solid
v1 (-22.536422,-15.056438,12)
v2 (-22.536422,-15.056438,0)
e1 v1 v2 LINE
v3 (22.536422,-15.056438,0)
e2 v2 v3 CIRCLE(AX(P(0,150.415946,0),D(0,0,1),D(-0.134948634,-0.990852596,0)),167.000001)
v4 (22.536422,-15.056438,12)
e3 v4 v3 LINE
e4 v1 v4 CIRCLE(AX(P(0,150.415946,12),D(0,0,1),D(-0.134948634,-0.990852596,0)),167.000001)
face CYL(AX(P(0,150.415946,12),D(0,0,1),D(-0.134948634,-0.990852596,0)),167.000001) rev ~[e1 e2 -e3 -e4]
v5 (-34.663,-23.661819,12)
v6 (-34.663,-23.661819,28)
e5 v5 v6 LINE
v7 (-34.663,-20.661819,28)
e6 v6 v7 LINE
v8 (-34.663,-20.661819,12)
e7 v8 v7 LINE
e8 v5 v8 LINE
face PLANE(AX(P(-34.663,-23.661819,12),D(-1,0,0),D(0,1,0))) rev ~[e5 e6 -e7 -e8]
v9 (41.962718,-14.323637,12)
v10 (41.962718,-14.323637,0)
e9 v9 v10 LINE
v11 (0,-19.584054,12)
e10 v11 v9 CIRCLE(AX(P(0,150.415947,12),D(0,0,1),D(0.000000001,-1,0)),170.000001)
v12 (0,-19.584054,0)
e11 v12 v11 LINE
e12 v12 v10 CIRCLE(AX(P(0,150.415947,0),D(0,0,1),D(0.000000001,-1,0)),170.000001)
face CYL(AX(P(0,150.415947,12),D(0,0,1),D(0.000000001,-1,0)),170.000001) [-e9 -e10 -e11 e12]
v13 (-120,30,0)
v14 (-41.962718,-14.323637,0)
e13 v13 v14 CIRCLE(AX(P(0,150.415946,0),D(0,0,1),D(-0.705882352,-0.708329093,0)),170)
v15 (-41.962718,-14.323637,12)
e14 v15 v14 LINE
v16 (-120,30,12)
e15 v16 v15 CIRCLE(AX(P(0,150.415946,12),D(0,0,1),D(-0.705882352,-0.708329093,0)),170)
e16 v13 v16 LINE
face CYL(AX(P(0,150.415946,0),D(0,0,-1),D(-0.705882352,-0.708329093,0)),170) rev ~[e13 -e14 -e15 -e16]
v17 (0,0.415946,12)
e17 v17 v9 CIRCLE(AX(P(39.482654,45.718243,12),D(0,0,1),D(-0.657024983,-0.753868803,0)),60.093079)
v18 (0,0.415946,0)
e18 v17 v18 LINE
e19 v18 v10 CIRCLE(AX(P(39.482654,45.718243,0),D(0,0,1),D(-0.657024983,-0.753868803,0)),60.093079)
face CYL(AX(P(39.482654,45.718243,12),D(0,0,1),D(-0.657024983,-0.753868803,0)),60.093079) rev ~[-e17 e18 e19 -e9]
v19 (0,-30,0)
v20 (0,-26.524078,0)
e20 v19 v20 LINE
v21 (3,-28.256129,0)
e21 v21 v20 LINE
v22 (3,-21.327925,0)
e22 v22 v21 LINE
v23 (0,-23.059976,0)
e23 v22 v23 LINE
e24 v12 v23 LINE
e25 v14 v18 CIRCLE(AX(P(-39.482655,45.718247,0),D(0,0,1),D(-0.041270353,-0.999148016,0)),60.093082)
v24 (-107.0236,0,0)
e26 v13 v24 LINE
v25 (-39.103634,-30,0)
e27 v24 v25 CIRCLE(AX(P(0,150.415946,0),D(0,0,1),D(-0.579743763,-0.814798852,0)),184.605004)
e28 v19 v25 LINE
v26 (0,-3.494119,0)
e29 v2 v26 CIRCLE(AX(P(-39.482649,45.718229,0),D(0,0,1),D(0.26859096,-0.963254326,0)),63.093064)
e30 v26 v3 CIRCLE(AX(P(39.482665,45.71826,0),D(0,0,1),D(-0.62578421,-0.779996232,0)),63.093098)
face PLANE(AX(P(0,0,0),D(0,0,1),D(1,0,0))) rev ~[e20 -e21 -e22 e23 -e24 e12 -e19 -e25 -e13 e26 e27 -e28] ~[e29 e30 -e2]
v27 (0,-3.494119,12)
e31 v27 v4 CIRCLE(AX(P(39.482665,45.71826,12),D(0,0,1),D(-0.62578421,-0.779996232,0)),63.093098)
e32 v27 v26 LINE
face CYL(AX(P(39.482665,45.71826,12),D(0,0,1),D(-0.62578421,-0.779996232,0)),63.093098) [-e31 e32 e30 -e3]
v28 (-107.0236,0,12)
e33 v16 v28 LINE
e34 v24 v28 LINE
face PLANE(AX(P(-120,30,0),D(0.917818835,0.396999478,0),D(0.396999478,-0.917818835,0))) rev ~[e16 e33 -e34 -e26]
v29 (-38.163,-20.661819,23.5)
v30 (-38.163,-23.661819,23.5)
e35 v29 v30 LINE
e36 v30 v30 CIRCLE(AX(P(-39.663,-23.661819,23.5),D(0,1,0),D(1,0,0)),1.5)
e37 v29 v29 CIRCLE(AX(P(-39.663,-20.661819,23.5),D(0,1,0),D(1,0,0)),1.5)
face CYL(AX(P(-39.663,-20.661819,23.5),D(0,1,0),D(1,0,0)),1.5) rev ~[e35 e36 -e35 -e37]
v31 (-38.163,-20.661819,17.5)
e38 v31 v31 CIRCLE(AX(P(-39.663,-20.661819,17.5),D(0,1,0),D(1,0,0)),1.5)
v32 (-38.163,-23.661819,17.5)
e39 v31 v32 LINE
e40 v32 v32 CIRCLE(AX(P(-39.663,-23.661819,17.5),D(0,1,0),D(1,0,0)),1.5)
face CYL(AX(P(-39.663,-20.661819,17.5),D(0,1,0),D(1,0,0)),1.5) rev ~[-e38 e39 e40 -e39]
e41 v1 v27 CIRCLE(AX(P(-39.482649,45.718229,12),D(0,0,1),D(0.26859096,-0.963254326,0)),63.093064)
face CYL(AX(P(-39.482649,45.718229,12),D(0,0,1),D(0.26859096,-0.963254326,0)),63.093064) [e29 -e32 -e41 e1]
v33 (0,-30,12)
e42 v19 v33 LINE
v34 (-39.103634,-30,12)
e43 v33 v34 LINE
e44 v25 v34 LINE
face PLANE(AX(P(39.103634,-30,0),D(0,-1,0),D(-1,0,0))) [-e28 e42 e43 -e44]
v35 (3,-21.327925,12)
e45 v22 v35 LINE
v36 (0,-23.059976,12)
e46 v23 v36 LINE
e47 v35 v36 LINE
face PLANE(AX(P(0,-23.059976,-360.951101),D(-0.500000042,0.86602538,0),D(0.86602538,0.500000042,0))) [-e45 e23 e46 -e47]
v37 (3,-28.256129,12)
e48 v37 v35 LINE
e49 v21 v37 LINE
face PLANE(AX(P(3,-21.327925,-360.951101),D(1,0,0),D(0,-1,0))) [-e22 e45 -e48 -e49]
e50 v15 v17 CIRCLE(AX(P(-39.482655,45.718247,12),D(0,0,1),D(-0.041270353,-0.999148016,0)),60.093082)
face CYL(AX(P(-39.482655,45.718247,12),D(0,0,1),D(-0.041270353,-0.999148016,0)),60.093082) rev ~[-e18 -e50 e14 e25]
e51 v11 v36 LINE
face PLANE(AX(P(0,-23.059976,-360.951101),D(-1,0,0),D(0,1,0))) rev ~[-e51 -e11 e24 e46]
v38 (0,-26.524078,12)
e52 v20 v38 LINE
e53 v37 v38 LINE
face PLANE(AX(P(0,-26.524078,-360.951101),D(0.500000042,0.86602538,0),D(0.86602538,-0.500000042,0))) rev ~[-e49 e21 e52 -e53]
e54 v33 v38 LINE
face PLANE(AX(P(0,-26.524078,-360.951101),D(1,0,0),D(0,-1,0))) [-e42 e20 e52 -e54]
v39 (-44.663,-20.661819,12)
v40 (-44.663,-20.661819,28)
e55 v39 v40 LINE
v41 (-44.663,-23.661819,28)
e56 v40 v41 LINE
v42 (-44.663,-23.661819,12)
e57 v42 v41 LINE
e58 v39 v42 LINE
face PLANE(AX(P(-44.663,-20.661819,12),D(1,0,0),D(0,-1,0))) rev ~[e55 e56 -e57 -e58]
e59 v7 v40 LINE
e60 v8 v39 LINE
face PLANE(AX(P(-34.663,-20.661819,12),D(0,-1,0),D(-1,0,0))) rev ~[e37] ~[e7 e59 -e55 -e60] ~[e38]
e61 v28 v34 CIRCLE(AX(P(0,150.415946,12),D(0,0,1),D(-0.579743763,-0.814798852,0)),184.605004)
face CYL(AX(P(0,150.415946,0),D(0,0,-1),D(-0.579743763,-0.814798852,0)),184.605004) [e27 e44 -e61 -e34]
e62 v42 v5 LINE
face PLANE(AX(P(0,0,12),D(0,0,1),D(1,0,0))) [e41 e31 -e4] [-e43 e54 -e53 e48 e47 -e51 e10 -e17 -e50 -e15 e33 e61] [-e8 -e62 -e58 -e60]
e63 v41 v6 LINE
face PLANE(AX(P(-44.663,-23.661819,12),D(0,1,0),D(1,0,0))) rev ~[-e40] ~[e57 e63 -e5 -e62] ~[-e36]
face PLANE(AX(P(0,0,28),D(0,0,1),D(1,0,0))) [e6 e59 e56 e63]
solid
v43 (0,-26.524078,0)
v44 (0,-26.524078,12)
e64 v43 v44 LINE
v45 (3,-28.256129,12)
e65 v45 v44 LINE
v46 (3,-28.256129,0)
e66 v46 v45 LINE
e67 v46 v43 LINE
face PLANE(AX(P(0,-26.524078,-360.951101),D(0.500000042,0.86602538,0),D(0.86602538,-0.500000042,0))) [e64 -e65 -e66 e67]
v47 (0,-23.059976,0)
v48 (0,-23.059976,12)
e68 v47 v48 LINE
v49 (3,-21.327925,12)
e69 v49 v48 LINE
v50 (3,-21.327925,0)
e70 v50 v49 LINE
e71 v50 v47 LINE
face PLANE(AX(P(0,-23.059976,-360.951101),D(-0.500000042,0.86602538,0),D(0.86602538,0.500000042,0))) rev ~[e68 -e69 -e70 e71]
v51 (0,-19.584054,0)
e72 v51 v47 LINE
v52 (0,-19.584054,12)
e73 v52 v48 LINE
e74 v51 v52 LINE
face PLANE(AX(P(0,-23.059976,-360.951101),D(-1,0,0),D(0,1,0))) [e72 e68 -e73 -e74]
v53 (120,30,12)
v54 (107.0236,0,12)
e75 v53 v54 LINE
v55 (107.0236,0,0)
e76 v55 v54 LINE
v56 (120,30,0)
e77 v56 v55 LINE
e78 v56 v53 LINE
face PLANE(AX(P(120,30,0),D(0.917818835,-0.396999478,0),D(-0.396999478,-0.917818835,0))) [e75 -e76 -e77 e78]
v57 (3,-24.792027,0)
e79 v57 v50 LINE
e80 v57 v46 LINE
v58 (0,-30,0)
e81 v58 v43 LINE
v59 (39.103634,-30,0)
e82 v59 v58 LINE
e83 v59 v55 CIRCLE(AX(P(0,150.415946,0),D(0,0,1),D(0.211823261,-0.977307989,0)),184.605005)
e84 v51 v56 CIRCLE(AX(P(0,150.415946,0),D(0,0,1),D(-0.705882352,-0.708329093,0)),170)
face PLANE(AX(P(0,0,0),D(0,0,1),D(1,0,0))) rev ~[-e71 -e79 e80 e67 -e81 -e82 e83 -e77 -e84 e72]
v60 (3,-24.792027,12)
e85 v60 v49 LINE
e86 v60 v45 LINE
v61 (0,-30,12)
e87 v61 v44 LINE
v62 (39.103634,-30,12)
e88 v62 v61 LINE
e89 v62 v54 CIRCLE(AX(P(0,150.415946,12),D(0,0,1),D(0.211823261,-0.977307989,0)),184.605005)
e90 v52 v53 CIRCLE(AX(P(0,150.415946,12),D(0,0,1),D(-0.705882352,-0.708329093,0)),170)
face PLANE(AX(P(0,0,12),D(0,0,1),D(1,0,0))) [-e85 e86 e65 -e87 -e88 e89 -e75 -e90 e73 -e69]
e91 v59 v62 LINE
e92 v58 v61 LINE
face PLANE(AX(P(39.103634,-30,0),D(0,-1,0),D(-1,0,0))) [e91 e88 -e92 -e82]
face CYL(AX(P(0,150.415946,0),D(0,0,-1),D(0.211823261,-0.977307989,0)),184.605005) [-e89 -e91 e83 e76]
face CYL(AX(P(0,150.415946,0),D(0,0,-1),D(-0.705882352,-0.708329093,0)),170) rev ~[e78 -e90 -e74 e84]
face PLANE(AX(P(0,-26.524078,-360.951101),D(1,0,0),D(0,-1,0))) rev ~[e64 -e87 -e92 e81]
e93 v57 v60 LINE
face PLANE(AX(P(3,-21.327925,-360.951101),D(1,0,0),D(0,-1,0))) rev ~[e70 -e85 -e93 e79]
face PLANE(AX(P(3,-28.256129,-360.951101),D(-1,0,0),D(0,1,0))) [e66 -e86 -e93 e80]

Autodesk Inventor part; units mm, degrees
sketch "Эскиз1" plane through (0, 0, 0) normal (0, 0, 1) x (1, 0, 0)
  line L0 (39.103634, -30) -> (-39.103634, -30)
  line L1 (-120, 30) -> (120, -30) construction
  line L2 (120, 30) -> (-120, -30) construction
  line L3 (0, -30) -> (0, -27) construction
  arc A0 (-120, 30) -> (120, 30) centre (0, 150.415946) ccw
  arc A1 (-107.0236, 0) -> (-39.103634, -30) centre (0, 150.415946) ccw
  arc A2 (39.103634, -30) -> (107.0236, 0) centre (0, 150.415946) ccw
  line L4 (120, 30) -> (107.0236, 0)
  line L5 (-120, 30) -> (-107.0236, 0)
  point P0 (0, 0)
  dimension "d0" = 240
  dimension "d1" = 60
  dimension "d6" = 3
  dimension "d7" = 170
extrude "Выдавливание1" add sketch "Эскиз1" along normal blind 12
sketch "Эскиз2" plane through (0, 0, 12) normal (0, 0, 1) x (1, 0, 0)
  line L0 (-39.103634, -30) -> (39.103634, -30)
  line L1 (-39.103634, -30) -> (39.103634, -30) construction
  line L2 (0, -30) -> (10, -30) construction
  line L3 (0, -30) -> (-10, -30) construction
  arc A0 (-120, 30) -> (120, 30) centre (0, 150.415946) ccw
  line L4 (-120, 30) -> (-107.0236, 0)
  arc A1 (-107.0236, 0) -> (-39.103634, -30) centre (0, 150.415946) ccw
  arc A2 (39.103634, -30) -> (107.0236, 0) centre (0, 150.415946) ccw
  line L5 (107.0236, 0) -> (120, 30)
  point P0 (0, 0)
  point P1 (-12, -3)
  point P2 (12, -3)
  dimension "d4" = 10
  dimension "d5" = 10
sketch "Эскиз3" plane through (0, 0, 12) normal (0, 0, 1) x (1, 0, 0)
  line L0 (-39.103634, -30) -> (39.103634, -30) construction
  line L1 (0, -30) -> (0, -19.584054) construction
  arc A0 (-120, 30) -> (120, 30) centre (0, 150.415946) ccw construction
  line L2 (0, -24.792027) -> (-58.147862, -24.792027) construction
  arc A1 (-107.0236, 0) -> (-39.103634, -30) centre (0, 150.415946) ccw construction
  arc A2 (39.103634, -30) -> (107.0236, 0) centre (0, 150.415946) ccw construction
  line L3 (58.147862, -24.792027) -> (0, -24.792027) construction
  line L4 (0, -24.792027) -> (0, -27.792027)
  line L5 (0, -27.792027) -> (0, -21.792027)
  line L6 (0, -24.792027) -> (6, -24.792027) construction
  line L7 (0, -26.524078) -> (3, -28.256129)
  line L8 (0, -24.792027) -> (6.928203, -24.792027) construction
  line L9 (3, -28.256129) -> (3, -24.792027)
  line L10 (0, -23.059976) -> (3, -21.327925)
  line L11 (0, -24.792027) -> (6.928203, -24.792027) construction
  line L12 (3, -21.327925) -> (3, -24.792027)
  line L13 (0, -24.792027) -> (-3, -24.792027) construction
  line L14 (0, -23.059976) -> (0, -19.584054)
  line L15 (0, -26.524078) -> (0, -30)
  point P0 (0, 0)
  dimension "d8" = 3
  dimension "d9" = 6
  dimension "d10" = 6
  dimension "d11" = 30
  dimension "d12" = 30
  dimension "d13" = 3
sketch "Эскиз4" plane through (0, 0, 0) normal (0, 0, -1) x (-1, 0, 0)
  line L0 (-3, -28.256129) -> (-3, -24.792027)
  line L1 (0, -26.524078) -> (-3, -28.256129)
  line L2 (-3, -21.327925) -> (-3, -24.792027)
  line L3 (0, -23.059976) -> (-3, -21.327925)
  line L4 (0, -24.792027) -> (0, -27.792027)
  line L5 (0, -27.792027) -> (0, -21.792027)
  point P0 (0, 0)
ref_plane "РабПлоскость1" through (3, -21.327925, 12) normal (0.5, -0.8660254, 0) x (-0.8660254, -0.5, 0)
ref_plane "РабПлоскость2" through (3, -21.327925, 0) normal (-1, 0, 0) x (0, -1, 0)
ref_plane "РабПлоскость3" through (0, -26.524078, 12) normal (0.5, 0.8660254, 0) x (0.8660254, -0.5, 0)
ref_plane "РабПлоскость4" through (0, -19.584054, 12) normal (1, 0, 0) x (0, -1, 0)
ref_plane "РабПлоскость5" through (0, -26.524078, 0) normal (-1, 0, 0) x (0, -1, 0)
split body "Разделение1" sketch "Эскиз3" result two bodies curves L15 L7 L9 L12 L10 L14 first body at (-18.576653, -26.256352, 0.5)
sketch "Эскиз5" plane through (0, 0, 12) normal (0, 0, 1) x (1, 0, 0)
  line L0 (0, -19.584054) -> (0, -23.059976)
  arc A0 (-120, 30) -> (0, -19.584054) centre (0, 150.415946) ccw
  line L1 (-120, 30) -> (-107.0236, 0)
  arc A1 (-107.0236, 0) -> (-39.103634, -30) centre (0, 150.415946) ccw
  line L2 (-39.103634, -30) -> (0, -30)
  line L3 (0, -26.524078) -> (0, -30)
  line L4 (3, -28.256129) -> (0, -26.524078)
  line L5 (3, -21.327925) -> (3, -28.256129)
  line L6 (0, -23.059976) -> (3, -21.327925)
  line L7 (39.103634, -30) -> (0, -30)
  line L8 (0, -19.584054) -> (0, -23.059976)
  line L9 (0, -23.059976) -> (3, -21.327925)
  line L10 (3, -21.327925) -> (3, -28.256129)
  line L11 (3, -28.256129) -> (0, -26.524078)
  line L12 (0, -26.524078) -> (0, -30)
  line L13 (0, -30) -> (39.103634, -30)
  arc A2 (39.103634, -30) -> (107.0236, 0) centre (0, 150.415946) ccw
  line L14 (107.0236, 0) -> (120, 30)
  arc A3 (0, -19.584054) -> (120, 30) centre (0, 150.415946) ccw
  arc A4 (0, -19.584054) -> (120, 30) centre (0, 150.415946) ccw construction
  line L15 (0, -19.584054) -> (0, 0.415946) construction
  arc A5 (0, -19.584054) -> (120, 30) centre (0, 150.415946) ccw
  arc A6 (0, 0.415946) -> (41.962718, -14.323637) centre (39.482655, 45.718245) ccw
  arc A7 (-41.962718, -14.323637) -> (0, 0.415946) centre (-39.482655, 45.718245) ccw
  arc A8 (-41.962718, -14.323637) -> (41.962718, -14.323637) centre (0, 150.415946) ccw
  arc A9 (0, -3.494119) -> (22.536422, -15.056438) centre (39.482655, 45.718245) ccw
  arc A10 (-22.536422, -15.056438) -> (22.536422, -15.056438) centre (0, 150.415946) ccw
  arc A11 (-22.536422, -15.056438) -> (0, -3.494119) centre (-39.482655, 45.718245) ccw
  point P0 (0, 0)
  dimension "d15" = 20
  dimension "d18" = 3
extrude "Выдавливание2" add sketch "Эскиз5" against normal up to surface (12 mm away) contours A0 A7 A6 A3 bodies 2
sketch "Эскиз6" plane through (0, 0, 12) normal (0, 0, 1) x (1, 0, 0)
  arc A0 (-22.536422, -15.056438) -> (0, -3.494119) centre (-39.482655, 45.718245) ccw construction
  arc A1 (0, -3.494119) -> (22.536422, -15.056438) centre (39.482655, 45.718245) ccw construction
  arc A2 (-22.536422, -15.056438) -> (22.536422, -15.056438) centre (0, 150.415946) ccw construction
  line L0 (0, -19.584054) -> (0, -23.059976) construction
  arc A3 (0, -19.584054) -> (41.962718, -14.323637) centre (0, 150.415946) ccw construction
  arc A4 (0, 0.415946) -> (41.962718, -14.323637) centre (39.482655, 45.718245) ccw construction
  arc A5 (-41.962718, -14.323637) -> (0, 0.415946) centre (-39.482655, 45.718245) ccw construction
  arc A6 (-120, 30) -> (-41.962718, -14.323637) centre (0, 150.415946) ccw construction
  line L1 (-120, 30) -> (-107.0236, 0) construction
  arc A7 (-107.0236, 0) -> (-39.103634, -30) centre (0, 150.415946) ccw construction
  line L2 (-39.103634, -30) -> (0, -30) construction
  line L3 (0, -26.524078) -> (0, -30) construction
  line L4 (3, -28.256129) -> (0, -26.524078) construction
  line L5 (3, -21.327925) -> (3, -28.256129) construction
  line L6 (0, -23.059976) -> (3, -21.327925) construction
  line L7 (0, -19.584054) -> (0, -23.059976) construction
  line L8 (0, -23.059976) -> (3, -21.327925) construction
  line L9 (3, -21.327925) -> (3, -28.256129) construction
  line L10 (3, -28.256129) -> (0, -26.524078) construction
  line L11 (0, -26.524078) -> (0, -30) construction
  line L12 (0, -30) -> (39.103634, -30) construction
  arc A8 (39.103634, -30) -> (107.0236, 0) centre (0, 150.415946) ccw construction
  line L13 (107.0236, 0) -> (120, 30) construction
  arc A9 (0, -19.584054) -> (120, 30) centre (0, 150.415946) ccw construction
  line L14 (107.0236, 0) -> (-107.0236, 0) construction
  line L15 (0, -30) -> (-100, -30) construction
  line L16 (0, -30) -> (100, -30) construction
  line L17 (100, -30) -> (-34.663, -30) construction
  line L18 (-100, -30) -> (-44.663, -30) construction
  line L19 (-34.663, -30) -> (-44.663, -30) construction
  line L20 (-34.663, -31.5) -> (-44.663, -31.5) construction
  line L21 (-44.663, -31.5) -> (-44.663, -28.5) construction
  line L22 (-44.663, -28.5) -> (-34.663, -28.5) construction
  line L23 (-34.663, -28.5) -> (-34.663, -31.5) construction
  line L24 (-34.663, -31.5) -> (-44.663, -28.5) construction
  line L25 (-44.663, -31.5) -> (-34.663, -28.5) construction
  line L26 (-34.663, -30) -> (-34.663, -14.323637) construction
  line L27 (-44.663, -30) -> (-44.663, -13.612151) construction
  line L28 (-34.663, -22.161819) -> (-44.663, -22.161819) construction
  line L29 (-34.663, -20.661819) -> (-44.663, -20.661819)
  line L30 (-44.663, -20.661819) -> (-44.663, -23.661819)
  line L31 (-44.663, -23.661819) -> (-34.663, -23.661819)
  line L32 (-34.663, -23.661819) -> (-34.663, -20.661819)
  line L33 (-34.663, -20.661819) -> (-44.663, -23.661819) construction
  line L34 (-44.663, -20.661819) -> (-34.663, -23.661819) construction
  point P0 (0, 0)
  point P1 (-39.663, -30)
  point P2 (-39.663, -22.161819)
  dimension "d19" = 100
  dimension "d20" = 100
  dimension "d21" = 134.663
  dimension "d22" = 55.337
  dimension "d23" = 3
  dimension "d24" = 3
extrude "Выдавливание3" add sketch "Эскиз6" along normal blind 16 bodies 2
sketch "Эскиз7" plane through (-44.663, -20.661819, 12) normal (0, 1, 0) x (1, 0, 0)
  line L0 (0, 0) -> (10, 0) projected
  line L1 (0, 0) -> (0, -16) projected
  line L2 (10, -16) -> (0, -16) projected
  line L3 (10, 0) -> (10, -16) projected
  line L4 (0, 0) -> (0, -5.5) construction
  line L5 (0, 0) -> (0, -16) construction
  line L6 (0, -5.5) -> (10, -5.5) construction
  line L7 (5, -16) -> (5, 0) construction
  line L8 (0, 0) -> (10, 0) construction
  circle A0 centre (5, -5.5) radius 1.5
  line L9 (5, -5.5) -> (5, -11.5) construction
  circle A1 centre (5, -11.5) radius 1.5
  point P0 (44.663, 12)
  dimension "d27" = 5.5
  dimension "d28" = 3
  dimension "d29" = 6
  dimension "d30" = 3
extrude "Выдавливание4" cut sketch "Эскиз7" against normal blind 10 contours A0 | A1 bodies 2
properties part number "Kick"
